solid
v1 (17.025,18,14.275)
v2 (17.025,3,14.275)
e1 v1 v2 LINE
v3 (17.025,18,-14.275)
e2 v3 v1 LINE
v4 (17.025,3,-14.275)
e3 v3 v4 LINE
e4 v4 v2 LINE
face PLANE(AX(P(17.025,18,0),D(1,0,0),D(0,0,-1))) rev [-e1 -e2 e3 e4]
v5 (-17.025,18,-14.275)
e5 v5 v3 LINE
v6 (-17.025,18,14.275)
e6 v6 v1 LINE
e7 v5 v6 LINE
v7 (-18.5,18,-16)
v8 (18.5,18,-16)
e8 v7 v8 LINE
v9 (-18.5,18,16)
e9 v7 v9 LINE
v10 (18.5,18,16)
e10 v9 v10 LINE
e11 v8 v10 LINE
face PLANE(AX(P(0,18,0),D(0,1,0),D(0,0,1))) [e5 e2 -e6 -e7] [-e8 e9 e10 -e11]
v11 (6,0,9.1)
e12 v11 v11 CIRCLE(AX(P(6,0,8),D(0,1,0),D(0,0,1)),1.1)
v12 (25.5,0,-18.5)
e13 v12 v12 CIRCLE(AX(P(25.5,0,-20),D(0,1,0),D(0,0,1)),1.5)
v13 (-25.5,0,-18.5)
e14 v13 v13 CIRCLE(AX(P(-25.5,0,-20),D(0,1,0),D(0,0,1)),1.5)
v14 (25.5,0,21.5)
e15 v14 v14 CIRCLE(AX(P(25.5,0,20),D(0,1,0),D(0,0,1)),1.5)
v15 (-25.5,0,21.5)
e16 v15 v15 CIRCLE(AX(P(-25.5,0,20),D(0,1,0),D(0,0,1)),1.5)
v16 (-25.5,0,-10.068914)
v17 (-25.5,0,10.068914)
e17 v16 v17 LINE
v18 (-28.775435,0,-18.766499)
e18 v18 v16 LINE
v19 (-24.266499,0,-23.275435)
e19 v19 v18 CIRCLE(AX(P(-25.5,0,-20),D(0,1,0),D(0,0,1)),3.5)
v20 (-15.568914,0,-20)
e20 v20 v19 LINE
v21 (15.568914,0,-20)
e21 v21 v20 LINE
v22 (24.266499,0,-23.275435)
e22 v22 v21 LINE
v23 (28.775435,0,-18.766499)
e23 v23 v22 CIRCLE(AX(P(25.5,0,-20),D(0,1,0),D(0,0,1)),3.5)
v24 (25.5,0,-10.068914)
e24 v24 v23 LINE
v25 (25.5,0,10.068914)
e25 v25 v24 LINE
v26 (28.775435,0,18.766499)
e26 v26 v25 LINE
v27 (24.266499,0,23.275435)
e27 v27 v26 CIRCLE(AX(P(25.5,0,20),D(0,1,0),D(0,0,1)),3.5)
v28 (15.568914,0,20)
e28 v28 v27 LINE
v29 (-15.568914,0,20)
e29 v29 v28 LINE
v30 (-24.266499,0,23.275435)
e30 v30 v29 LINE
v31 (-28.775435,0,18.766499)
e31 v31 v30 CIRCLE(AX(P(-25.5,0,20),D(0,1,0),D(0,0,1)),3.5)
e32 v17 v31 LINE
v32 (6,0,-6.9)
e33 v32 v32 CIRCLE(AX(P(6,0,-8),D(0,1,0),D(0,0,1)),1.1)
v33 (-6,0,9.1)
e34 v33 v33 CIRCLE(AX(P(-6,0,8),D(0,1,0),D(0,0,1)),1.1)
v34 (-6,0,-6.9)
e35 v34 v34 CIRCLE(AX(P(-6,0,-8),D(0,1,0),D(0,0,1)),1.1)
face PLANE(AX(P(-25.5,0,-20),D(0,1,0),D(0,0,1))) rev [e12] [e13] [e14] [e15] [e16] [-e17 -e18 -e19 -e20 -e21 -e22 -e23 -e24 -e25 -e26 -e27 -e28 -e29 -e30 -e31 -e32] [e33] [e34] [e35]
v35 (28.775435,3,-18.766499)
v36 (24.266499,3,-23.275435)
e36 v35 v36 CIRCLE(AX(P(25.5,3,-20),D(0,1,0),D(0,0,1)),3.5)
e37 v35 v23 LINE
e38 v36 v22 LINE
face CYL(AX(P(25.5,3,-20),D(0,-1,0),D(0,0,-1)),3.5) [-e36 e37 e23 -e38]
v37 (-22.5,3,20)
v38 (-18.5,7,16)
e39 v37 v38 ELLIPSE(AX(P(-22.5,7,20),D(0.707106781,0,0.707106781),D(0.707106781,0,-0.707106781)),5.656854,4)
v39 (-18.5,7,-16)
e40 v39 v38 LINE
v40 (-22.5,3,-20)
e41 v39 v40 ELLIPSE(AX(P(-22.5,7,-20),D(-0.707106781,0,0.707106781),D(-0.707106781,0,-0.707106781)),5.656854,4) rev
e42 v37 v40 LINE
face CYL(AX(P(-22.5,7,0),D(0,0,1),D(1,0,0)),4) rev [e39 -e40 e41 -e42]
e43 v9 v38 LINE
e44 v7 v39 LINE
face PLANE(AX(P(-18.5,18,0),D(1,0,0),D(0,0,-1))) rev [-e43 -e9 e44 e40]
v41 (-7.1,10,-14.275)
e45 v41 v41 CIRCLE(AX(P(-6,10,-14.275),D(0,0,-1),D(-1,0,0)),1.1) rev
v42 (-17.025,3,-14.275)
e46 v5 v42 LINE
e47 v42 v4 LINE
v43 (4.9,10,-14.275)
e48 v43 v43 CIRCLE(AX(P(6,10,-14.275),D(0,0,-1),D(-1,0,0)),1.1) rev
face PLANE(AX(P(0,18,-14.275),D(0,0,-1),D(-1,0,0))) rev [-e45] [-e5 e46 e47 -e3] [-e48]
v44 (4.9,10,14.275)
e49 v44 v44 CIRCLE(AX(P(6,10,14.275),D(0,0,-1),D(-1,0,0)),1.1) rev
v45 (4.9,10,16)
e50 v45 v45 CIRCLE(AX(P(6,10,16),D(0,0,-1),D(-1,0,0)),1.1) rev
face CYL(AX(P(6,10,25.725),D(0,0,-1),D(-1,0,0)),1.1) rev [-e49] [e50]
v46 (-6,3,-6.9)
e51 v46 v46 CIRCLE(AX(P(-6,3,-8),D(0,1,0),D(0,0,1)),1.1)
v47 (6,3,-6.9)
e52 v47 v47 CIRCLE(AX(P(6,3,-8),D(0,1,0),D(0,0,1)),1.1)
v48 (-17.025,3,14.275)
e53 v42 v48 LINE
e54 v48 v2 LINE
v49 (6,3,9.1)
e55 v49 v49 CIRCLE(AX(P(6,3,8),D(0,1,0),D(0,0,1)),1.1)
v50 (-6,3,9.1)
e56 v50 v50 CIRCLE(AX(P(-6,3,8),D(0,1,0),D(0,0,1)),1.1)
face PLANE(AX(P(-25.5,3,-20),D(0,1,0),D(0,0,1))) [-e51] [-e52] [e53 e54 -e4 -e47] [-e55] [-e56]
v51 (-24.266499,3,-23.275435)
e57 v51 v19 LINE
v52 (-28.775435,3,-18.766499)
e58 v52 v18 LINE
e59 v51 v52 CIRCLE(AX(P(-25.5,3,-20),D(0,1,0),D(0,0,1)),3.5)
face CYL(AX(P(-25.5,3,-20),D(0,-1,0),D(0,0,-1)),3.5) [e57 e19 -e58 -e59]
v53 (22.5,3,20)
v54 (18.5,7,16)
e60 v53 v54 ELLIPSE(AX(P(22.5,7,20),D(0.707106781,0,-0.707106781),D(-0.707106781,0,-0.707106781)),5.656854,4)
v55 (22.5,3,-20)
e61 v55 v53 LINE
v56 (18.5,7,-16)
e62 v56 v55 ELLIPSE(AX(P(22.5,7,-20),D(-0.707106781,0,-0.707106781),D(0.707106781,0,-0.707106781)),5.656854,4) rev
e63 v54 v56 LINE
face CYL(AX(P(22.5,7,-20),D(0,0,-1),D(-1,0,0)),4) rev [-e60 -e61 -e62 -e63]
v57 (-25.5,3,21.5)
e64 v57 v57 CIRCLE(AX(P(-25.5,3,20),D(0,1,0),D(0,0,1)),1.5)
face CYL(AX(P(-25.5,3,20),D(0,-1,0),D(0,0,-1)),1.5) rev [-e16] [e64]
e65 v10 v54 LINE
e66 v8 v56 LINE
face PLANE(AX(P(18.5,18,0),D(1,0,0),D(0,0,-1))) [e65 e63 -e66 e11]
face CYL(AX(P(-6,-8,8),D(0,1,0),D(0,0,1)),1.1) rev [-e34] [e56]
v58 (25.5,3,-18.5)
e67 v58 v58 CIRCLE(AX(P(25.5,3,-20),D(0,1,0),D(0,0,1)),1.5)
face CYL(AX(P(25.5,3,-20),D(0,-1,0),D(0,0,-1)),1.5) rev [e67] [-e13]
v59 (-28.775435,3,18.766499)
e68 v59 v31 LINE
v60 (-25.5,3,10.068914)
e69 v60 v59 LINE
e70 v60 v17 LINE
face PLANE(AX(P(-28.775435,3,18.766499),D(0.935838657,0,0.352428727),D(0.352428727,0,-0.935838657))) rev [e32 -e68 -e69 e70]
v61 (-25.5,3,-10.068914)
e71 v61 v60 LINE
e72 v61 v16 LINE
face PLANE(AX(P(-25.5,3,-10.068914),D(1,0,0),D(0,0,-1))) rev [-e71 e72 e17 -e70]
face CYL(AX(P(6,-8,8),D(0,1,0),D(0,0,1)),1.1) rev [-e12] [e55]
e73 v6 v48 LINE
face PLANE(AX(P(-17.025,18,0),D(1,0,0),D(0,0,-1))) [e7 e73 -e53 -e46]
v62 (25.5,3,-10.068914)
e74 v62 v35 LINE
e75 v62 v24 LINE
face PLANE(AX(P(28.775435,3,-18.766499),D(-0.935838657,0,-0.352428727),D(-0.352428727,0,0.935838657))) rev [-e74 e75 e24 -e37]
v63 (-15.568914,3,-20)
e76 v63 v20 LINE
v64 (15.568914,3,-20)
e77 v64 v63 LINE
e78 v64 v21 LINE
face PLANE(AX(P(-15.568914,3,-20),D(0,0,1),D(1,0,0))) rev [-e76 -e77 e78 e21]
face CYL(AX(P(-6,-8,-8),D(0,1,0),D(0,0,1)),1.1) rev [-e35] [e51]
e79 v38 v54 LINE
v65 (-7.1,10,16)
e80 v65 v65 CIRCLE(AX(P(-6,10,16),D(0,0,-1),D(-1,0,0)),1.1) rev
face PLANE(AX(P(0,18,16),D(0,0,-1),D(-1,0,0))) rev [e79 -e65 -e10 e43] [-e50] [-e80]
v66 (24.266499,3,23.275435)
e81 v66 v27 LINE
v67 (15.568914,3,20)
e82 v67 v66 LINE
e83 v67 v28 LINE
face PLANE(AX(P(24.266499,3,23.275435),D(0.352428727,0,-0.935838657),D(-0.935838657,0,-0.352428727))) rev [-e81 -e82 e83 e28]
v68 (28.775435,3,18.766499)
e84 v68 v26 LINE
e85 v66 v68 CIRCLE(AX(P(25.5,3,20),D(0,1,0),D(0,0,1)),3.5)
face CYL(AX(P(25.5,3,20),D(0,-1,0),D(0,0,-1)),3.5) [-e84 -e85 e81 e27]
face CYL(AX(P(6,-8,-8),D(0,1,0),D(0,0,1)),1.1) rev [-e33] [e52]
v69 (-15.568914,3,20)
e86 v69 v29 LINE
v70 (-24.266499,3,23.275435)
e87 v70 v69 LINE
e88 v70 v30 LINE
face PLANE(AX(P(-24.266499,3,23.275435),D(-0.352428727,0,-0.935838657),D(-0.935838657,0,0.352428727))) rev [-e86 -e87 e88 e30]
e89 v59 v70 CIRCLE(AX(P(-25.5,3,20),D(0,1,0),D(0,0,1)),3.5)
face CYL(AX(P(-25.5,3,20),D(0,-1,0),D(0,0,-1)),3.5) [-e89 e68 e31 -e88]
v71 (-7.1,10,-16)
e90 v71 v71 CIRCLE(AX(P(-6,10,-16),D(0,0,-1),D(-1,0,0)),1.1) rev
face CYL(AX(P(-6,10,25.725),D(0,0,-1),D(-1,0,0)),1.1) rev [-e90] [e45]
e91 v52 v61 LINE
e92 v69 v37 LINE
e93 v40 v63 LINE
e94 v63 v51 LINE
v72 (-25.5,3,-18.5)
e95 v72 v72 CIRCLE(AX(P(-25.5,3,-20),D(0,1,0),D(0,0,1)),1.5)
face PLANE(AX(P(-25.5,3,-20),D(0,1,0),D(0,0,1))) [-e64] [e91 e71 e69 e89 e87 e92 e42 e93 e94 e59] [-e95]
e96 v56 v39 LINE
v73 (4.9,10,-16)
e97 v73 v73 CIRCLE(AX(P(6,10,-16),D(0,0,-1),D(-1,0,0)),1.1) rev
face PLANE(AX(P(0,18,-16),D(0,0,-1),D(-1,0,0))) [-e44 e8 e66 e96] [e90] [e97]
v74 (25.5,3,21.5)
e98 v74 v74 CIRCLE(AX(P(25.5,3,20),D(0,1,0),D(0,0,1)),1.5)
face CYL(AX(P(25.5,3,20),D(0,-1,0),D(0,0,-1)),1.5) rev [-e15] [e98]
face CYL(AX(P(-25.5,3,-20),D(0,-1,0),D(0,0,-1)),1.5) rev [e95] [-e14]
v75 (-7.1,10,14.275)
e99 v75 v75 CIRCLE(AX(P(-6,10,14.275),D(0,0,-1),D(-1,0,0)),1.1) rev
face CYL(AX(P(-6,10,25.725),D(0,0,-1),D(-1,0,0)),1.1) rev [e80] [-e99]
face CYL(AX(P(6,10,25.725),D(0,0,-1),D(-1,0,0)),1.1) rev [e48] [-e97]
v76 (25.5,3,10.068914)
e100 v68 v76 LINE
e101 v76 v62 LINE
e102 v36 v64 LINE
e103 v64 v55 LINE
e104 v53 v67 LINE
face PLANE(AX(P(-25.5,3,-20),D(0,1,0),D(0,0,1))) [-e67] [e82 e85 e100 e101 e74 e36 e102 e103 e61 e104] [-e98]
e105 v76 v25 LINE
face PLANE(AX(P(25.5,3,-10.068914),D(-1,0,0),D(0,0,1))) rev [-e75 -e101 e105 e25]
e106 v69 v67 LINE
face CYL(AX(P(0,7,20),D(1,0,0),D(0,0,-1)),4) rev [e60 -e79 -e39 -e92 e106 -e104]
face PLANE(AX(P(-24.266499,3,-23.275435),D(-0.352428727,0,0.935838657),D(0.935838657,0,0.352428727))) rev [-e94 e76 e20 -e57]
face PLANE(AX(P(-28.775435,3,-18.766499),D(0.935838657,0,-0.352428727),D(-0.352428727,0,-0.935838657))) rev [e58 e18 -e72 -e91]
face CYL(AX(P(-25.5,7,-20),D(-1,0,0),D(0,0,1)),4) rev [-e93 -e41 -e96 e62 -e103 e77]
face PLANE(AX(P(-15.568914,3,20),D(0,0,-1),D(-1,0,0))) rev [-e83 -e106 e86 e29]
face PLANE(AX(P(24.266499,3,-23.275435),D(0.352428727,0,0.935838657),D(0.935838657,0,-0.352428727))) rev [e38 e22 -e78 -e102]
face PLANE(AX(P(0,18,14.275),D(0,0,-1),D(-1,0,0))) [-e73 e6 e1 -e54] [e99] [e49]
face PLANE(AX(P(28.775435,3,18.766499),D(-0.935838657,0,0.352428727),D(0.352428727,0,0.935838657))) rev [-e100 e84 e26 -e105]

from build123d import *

# Parameters (mm, degrees)
SKETCH1_R               = 1.5
BOSS_EXTRUDE2_DEPTH     = 3
SKETCH2_W               = 37
SKETCH2_H               = 32
SKETCH2_W_2             = 34.05
SKETCH2_H_2             = 28.55
BOSS_EXTRUDE3_DEPTH     = 15
CUT_EXTRUDE1_DEPTH      = 40
CUT_EXTRUDE1_DEPTH_BACK = 11
SKETCH2_4_R             = 1.1
CUT_EXTRUDE2_DEPTH      = 11
FILLET1_R               = 4


with BuildPart() as part:
    # Sketch1 → Boss-Extrude2 (new body)
    with BuildSketch(Plane(origin=(0, 0, 0), x_dir=(1, 0, 0), z_dir=(0, 1, 0))):
        with BuildLine():
            Line((-24.266499455, 23.2754353), (-15.568913997, 20))
            Line((-15.568913997, 20), (15.568913997, 20))
            Line((15.568913997, 20), (24.266499455, 23.2754353))
            ThreePointArc((24.266499455, 23.2754353), (27.974873734, 22.474873734), (28.7754353, 18.766499455))
            Line((28.7754353, 18.766499455), (25.5, 10.068913997))
            Line((25.5, 10.068913997), (25.5, -10.068913997))
            Line((25.5, -10.068913997), (28.7754353, -18.766499455))
            ThreePointArc((28.7754353, -18.766499455), (27.974873734, -22.474873734), (24.266499455, -23.2754353))
            Line((24.266499455, -23.2754353), (15.568913997, -20))
            Line((15.568913997, -20), (-15.568913997, -20))
            Line((-15.568913997, -20), (-24.266499455, -23.2754353))
            ThreePointArc((-24.266499455, -23.2754353), (-27.974873734, -22.474873734), (-28.7754353, -18.766499455))
            Line((-28.7754353, -18.766499455), (-25.5, -10.068913997))
            Line((-25.5, -10.068913997), (-25.5, 10.068913997))
            Line((-25.5, 10.068913997), (-28.7754353, 18.766499455))
            ThreePointArc((-28.7754353, 18.766499455), (-27.974873734, 22.474873734), (-24.266499455, 23.2754353))
        make_face()
        with Locations(Location((-25.5, 20, 0), (0, 0, 270))):
            Circle(SKETCH1_R, mode=Mode.SUBTRACT)
        with Locations(Location((25.5, 20, 0), (0, 0, 270))):
            Circle(SKETCH1_R, mode=Mode.SUBTRACT)
        with Locations(Location((25.5, -20, 0), (0, 0, 270))):
            Circle(SKETCH1_R, mode=Mode.SUBTRACT)
        with Locations(Location((-25.5, -20, 0), (0, 0, 270))):
            Circle(SKETCH1_R, mode=Mode.SUBTRACT)
    extrude(amount=BOSS_EXTRUDE2_DEPTH)

    # Sketch2 → Boss-Extrude3 (add)
    with BuildSketch(Plane(origin=(0, 3, 0), x_dir=(1, 0, 0), z_dir=(0, 1, 0))):
        Rectangle(SKETCH2_W, SKETCH2_H)
        Rectangle(SKETCH2_W_2, SKETCH2_H_2, mode=Mode.SUBTRACT)
    extrude(amount=BOSS_EXTRUDE3_DEPTH)

    # Sketch3 → Cut-Extrude1 (cut, two sides: drawn at the far end of the back side and taken through both)
    with BuildSketch(Plane.XY.offset(-14.275).offset(-CUT_EXTRUDE1_DEPTH_BACK)):
        with BuildLine():
            ThreePointArc((-4.9, 10), (-6.777817459, 10.777817459), (-6, 8.9))
            Line((-6, 8.9), (-6, 10))
            Line((-6, 10), (-4.9, 10))
        make_face()
        with BuildLine():
            Line((-6, 10), (-6, 8.9))
            ThreePointArc((-6, 8.9), (-5.222182541, 9.222182541), (-4.9, 10))
            Line((-4.9, 10), (-6, 10))
        make_face()
        with BuildLine():
            ThreePointArc((4.9, 10), (5.222182541, 9.222182541), (6, 8.9))
            Line((6, 8.9), (6, 10))
            Line((6, 10), (4.9, 10))
        make_face()
        with BuildLine():
            Line((6, 10), (6, 8.9))
            ThreePointArc((6, 8.9), (6.777817459, 9.222182541), (7.1, 10))
            ThreePointArc((7.1, 10), (6, 11.1), (4.9, 10))
            Line((4.9, 10), (6, 10))
        make_face()
    extrude(amount=CUT_EXTRUDE1_DEPTH + CUT_EXTRUDE1_DEPTH_BACK, mode=Mode.SUBTRACT)

    # Sketch2<4> → Cut-Extrude2 (cut)
    with BuildSketch(Plane(origin=(0, 3, 0), x_dir=(1, 0, 0), z_dir=(0, 1, 0))):
        with Locations(Location((-6, 8, 0), (0, 0, 270))):
            Circle(SKETCH2_4_R)
        with Locations(Location((6, 8, 0), (0, 0, 270))):
            Circle(SKETCH2_4_R)
        with Locations(Location((6, -8, 0), (0, 0, 270))):
            Circle(SKETCH2_4_R)
        with Locations(Location((-6, -8, 0), (0, 0, 270))):
            Circle(SKETCH2_4_R)
    extrude(amount=-CUT_EXTRUDE2_DEPTH, mode=Mode.SUBTRACT)

    # Fillet1
    fillet1_edges = [part.edges().sort_by_distance(p)[0] for p in [
        (-18.5, 3, 0),
        (0, 3, 16),
        (18.5, 3, 0),
        (0, 3, -16),
    ]]
    fillet(fillet1_edges, radius=FILLET1_R - 0.0001)  # a hair under: the kernel refuses the full size


solid = part.part
